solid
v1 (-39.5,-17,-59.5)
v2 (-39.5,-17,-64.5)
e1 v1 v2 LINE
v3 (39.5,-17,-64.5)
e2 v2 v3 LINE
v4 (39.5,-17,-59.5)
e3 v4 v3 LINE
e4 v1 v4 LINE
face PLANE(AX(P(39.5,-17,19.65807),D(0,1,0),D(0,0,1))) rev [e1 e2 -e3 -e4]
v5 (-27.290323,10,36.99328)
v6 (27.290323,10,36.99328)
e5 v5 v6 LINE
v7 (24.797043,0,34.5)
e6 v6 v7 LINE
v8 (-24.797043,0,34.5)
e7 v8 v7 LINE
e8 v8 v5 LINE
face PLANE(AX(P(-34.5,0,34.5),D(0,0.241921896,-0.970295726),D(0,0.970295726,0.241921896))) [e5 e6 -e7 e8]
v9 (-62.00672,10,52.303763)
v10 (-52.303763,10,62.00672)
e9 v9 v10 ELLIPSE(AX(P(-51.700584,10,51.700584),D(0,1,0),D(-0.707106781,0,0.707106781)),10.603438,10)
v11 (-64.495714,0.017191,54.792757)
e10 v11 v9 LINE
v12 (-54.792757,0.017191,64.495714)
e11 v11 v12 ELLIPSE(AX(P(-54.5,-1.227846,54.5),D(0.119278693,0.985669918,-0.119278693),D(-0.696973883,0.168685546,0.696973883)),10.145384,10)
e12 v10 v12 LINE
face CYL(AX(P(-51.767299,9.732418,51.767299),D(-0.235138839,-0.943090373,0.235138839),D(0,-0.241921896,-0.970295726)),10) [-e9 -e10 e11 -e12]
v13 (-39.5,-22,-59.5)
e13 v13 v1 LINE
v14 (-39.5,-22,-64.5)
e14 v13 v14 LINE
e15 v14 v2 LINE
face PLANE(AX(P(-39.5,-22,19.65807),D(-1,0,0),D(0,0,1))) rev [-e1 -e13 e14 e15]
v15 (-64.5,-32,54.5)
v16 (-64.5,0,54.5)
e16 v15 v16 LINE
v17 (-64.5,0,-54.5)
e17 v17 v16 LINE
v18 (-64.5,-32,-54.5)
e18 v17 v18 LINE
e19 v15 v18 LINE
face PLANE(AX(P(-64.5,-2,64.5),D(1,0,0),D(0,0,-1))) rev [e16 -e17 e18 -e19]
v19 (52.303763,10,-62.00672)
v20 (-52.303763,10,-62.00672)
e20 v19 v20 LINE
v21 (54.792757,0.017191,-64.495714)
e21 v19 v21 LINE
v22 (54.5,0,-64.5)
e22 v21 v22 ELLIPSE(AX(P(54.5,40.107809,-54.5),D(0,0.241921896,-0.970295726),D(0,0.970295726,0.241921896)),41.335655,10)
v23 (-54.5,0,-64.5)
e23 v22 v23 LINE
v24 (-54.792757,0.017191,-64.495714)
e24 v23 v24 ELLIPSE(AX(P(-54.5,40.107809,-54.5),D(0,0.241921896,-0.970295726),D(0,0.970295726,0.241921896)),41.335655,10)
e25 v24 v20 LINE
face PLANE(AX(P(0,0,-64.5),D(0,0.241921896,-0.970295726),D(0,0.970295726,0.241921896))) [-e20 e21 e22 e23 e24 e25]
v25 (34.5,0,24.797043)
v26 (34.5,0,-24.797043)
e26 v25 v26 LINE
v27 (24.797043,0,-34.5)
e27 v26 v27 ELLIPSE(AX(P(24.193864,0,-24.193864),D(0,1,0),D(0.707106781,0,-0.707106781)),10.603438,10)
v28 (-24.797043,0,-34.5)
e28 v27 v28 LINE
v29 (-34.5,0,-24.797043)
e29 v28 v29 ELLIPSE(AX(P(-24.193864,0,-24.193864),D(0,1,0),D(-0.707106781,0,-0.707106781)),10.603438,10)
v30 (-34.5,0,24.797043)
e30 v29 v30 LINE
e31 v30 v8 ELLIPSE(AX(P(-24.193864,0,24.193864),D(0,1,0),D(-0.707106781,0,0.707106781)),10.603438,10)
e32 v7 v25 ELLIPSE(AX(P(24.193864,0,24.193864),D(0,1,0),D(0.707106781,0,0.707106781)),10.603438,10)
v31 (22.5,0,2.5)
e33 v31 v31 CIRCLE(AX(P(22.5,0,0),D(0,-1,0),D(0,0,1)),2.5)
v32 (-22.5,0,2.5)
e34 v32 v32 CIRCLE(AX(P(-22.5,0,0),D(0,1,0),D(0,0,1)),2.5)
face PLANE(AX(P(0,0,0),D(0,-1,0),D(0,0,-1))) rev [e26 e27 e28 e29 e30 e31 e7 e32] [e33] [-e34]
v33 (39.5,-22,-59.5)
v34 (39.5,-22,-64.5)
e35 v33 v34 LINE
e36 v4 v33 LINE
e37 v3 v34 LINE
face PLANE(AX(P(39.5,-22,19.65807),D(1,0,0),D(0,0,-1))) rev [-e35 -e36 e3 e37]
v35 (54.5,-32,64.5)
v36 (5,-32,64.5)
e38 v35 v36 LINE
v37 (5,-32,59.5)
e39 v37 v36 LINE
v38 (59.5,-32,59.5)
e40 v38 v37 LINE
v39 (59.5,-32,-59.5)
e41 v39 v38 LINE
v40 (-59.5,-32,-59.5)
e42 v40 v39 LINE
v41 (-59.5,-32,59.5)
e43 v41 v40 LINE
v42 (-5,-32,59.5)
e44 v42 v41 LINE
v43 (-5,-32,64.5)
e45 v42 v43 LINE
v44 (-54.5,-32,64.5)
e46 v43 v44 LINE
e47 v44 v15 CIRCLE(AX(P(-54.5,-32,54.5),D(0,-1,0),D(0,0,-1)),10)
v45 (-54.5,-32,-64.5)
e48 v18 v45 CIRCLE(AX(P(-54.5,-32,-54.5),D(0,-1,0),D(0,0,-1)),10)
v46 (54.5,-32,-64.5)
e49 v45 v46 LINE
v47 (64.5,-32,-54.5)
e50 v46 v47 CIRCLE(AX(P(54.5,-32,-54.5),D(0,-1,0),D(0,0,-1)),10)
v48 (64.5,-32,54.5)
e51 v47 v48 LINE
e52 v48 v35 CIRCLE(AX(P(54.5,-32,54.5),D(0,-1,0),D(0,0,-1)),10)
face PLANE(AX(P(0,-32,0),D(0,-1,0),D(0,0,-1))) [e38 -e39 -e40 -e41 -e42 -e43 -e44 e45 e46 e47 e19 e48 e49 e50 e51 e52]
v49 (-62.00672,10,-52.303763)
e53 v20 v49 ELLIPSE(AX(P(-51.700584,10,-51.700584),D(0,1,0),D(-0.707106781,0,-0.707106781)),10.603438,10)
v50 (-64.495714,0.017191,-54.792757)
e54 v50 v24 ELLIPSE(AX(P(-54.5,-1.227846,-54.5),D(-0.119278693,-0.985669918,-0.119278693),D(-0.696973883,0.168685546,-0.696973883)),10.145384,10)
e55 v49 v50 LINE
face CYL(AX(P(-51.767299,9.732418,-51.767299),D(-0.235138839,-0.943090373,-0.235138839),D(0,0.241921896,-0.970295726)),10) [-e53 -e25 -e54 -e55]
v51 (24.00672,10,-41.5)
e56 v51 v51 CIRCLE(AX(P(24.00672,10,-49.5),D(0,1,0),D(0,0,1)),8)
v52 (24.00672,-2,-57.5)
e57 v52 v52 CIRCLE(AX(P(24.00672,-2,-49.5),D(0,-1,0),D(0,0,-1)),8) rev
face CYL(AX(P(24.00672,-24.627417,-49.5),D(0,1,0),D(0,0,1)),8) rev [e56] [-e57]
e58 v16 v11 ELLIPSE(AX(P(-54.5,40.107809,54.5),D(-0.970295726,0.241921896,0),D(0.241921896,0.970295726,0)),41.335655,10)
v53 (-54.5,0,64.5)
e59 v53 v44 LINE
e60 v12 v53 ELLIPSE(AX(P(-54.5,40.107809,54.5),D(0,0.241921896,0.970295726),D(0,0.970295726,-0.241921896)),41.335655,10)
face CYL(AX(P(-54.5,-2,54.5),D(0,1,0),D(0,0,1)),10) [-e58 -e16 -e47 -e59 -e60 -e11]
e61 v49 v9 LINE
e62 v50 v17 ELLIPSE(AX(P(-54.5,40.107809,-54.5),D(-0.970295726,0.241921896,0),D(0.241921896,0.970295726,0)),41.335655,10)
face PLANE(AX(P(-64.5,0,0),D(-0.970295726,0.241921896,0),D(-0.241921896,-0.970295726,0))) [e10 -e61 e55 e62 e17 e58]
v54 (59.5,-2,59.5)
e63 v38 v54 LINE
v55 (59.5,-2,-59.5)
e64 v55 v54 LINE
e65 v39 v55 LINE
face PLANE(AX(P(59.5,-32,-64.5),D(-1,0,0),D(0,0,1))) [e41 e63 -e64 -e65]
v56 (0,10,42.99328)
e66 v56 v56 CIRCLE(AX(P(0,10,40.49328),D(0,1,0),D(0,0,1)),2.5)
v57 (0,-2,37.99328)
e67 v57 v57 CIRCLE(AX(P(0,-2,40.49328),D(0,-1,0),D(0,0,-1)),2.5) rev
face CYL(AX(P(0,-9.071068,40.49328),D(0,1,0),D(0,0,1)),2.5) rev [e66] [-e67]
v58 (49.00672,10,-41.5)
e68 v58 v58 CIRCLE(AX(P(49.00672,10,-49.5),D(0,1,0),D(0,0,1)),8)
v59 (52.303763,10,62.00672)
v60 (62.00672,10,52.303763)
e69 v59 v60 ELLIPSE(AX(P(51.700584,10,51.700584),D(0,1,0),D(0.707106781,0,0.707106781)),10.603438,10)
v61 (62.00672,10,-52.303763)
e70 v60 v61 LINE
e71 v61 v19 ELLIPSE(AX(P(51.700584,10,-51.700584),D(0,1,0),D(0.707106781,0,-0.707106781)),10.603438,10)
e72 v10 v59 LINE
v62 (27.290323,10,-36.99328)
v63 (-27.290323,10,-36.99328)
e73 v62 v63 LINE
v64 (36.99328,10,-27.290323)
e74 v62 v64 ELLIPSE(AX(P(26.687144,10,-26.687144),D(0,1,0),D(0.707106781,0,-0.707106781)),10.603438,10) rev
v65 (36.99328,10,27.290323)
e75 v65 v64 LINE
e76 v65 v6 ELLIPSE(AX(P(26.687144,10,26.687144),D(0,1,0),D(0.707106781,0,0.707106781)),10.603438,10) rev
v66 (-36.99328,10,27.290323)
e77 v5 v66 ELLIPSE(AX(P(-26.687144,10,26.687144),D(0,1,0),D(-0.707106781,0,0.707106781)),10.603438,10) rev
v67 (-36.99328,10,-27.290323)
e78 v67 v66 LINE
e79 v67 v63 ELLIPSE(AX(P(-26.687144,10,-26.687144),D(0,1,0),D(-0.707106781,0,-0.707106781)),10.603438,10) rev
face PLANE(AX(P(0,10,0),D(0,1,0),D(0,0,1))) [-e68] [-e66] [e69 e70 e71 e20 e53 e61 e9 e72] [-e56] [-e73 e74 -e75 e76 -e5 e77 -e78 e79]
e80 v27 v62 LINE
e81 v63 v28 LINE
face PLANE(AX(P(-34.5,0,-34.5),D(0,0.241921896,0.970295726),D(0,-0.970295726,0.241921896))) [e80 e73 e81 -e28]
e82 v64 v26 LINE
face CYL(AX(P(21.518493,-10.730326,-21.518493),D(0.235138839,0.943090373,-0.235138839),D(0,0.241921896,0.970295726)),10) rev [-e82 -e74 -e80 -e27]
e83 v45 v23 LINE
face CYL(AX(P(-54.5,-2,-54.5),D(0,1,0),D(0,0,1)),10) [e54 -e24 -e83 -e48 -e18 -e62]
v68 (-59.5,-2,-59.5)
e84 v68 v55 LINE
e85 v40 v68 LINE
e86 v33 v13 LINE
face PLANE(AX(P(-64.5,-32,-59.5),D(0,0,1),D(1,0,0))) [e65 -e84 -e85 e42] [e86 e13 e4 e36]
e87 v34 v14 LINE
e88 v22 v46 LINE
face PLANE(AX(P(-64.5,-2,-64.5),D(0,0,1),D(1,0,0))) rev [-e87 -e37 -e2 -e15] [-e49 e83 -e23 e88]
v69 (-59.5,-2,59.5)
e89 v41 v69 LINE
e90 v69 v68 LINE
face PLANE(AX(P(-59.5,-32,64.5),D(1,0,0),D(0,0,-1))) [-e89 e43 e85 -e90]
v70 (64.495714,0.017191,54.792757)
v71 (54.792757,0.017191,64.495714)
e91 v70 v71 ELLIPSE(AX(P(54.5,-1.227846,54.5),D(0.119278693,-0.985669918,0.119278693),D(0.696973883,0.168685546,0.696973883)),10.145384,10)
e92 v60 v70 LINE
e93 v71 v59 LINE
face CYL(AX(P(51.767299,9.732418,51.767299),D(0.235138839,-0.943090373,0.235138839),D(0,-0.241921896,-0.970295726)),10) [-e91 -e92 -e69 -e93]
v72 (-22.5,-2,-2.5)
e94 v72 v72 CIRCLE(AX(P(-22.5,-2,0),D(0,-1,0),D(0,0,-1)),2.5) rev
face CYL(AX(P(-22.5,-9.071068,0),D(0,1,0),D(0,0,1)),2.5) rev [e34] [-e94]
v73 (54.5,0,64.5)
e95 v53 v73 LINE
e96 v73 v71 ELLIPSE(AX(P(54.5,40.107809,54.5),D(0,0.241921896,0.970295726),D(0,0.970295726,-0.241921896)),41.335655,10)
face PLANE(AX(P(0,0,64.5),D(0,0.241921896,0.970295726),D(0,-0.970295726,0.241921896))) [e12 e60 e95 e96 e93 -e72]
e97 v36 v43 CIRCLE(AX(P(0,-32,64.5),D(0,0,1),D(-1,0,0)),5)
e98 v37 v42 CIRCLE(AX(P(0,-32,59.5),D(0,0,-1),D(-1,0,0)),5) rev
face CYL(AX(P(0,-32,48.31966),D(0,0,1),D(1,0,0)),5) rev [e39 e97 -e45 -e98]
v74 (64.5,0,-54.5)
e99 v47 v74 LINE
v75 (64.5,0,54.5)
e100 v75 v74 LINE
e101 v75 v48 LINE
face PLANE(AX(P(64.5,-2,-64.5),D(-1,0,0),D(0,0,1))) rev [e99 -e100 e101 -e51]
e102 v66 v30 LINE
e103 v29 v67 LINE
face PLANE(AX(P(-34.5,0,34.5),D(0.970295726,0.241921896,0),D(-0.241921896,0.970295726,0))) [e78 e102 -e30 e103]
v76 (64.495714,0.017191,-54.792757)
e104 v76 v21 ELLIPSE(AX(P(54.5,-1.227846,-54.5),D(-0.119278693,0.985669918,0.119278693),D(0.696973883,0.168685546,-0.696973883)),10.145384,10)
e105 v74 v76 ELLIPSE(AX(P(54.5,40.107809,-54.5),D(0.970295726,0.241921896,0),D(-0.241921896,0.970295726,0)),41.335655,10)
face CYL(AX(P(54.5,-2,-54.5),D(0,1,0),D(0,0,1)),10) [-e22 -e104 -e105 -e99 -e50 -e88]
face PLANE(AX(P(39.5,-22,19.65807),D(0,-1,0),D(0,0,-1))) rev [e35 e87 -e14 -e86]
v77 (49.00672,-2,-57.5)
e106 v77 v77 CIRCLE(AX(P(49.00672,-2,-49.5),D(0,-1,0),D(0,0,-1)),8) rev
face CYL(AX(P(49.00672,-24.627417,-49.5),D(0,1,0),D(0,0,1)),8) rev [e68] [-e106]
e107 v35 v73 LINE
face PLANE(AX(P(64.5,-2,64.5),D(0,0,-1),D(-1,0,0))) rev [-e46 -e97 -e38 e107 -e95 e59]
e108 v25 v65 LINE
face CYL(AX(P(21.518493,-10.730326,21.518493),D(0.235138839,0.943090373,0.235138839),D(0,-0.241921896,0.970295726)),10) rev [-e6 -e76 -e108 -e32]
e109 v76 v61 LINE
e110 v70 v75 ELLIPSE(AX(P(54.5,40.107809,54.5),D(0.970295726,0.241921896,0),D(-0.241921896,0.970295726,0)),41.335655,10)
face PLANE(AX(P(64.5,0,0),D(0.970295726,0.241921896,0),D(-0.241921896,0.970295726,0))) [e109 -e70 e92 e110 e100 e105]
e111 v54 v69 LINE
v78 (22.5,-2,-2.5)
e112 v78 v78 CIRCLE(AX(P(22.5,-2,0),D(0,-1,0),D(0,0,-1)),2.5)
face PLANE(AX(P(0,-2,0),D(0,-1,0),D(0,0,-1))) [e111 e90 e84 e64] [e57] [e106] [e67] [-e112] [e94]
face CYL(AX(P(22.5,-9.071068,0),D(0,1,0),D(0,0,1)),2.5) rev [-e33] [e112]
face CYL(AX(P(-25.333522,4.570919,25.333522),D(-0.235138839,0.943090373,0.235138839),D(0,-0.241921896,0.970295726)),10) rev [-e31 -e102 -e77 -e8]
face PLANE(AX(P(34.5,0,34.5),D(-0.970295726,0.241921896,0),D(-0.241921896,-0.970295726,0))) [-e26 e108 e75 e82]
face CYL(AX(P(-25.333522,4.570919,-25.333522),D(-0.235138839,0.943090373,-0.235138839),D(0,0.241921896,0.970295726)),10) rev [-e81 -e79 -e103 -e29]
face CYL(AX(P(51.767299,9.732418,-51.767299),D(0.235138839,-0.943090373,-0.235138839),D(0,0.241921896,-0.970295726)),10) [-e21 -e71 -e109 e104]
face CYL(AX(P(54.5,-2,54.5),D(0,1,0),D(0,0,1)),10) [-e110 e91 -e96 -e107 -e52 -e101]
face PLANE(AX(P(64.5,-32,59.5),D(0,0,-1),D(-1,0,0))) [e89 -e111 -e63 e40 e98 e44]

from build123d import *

# Parameters (mm, degrees)
SKETCH1_W           = 129
SKETCH1_H           = 129
SKETCH1_W_2         = 69
SKETCH1_H_2         = 69
EXTRUDE_THIN1_DEPTH = 10
EXTRUDE_THIN1_DRAFT = 14
FILLET1_R           = 10
SKETCH3_W           = 129
SKETCH3_H           = 129
BOSS_EXTRUDE1_DEPTH = 2
SKETCH4_R           = 2.5
CUT_EXTRUDE1_DEPTH  = 2
SKETCH5_W           = 129
SKETCH5_H           = 129
SKETCH5_W_2         = 119
SKETCH5_H_2         = 119
EXTRUDE_THIN2_DEPTH = 30
CUT_EXTRUDE2_DEPTH  = 5
SKETCH7_R           = 2.5
CUT_EXTRUDE3_DEPTH  = 12
FILLET2_R           = 10
SKETCH8_W           = 79
SKETCH8_H           = 5
CUT_EXTRUDE4_DEPTH  = 5
SKETCH9_R           = 8
CUT_EXTRUDE5_DEPTH  = 12
SKETCH9_3_R         = 8
CUT_EXTRUDE6_DEPTH  = 12


with BuildPart() as part:
    # Sketch1 → Extrude-Thin1 (with draft: the straight prism first)
    with BuildSketch(Plane(origin=(0, 0, 0), x_dir=(1, 0, 0), z_dir=(0, 1, 0))):
        Rectangle(SKETCH1_W, SKETCH1_H)
        Rectangle(SKETCH1_W_2, SKETCH1_H_2, mode=Mode.SUBTRACT)
    extrude(amount=EXTRUDE_THIN1_DEPTH)
    # Extrude-Thin1: the draft: its side faces are tilted about the plane it starts from
    extrude_thin1_sides = [part.faces().sort_by_distance(p)[0] for p in [
        (0, 5, -64.5),
        (-64.5, 5, 0),
        (0, 5, 64.5),
        (64.5, 5, 0),
        (34.5, 5, 0),
        (0, 5, 34.5),
        (-34.5, 5, 0),
        (0, 5, -34.5),
    ]]
    draft(extrude_thin1_sides, Plane(origin=(0, 0, 0), x_dir=(1, 0, 0), z_dir=(0, 1, 0)), EXTRUDE_THIN1_DRAFT)

    # Fillet1
    fillet1_edges = [part.edges().sort_by_distance(p)[0] for p in [
        (35.746640014, 5, 35.746640014),
        (35.746640014, 5, -35.746640014),
        (-35.746640014, 5, -35.746640014),
        (-35.746640014, 5, 35.746640014),
    ]]
    fillet(fillet1_edges, radius=FILLET1_R)

    # Sketch3 → Boss-Extrude1 (add)
    with BuildSketch(Plane.XZ):
        Rectangle(SKETCH3_W, SKETCH3_H)
    extrude(amount=BOSS_EXTRUDE1_DEPTH)

    # Sketch4 → Cut-Extrude1 (cut)
    with BuildSketch(Plane(origin=(0, 0, 0), x_dir=(1, 0, 0), z_dir=(0, 1, 0))):
        with Locations(Location((-22.5, 0, 0), (0, 0, 270))):
            Circle(SKETCH4_R)
    cut_extrude1 = extrude(amount=-CUT_EXTRUDE1_DEPTH, mode=Mode.SUBTRACT)

    # Mirror1: Cut-Extrude1 across plane
    add(cut_extrude1.mirror(Plane(origin=(0, 0, 0), x_dir=(0, 0, 1), z_dir=(1, 0, 0))), mode=Mode.SUBTRACT)

    # Sketch5 → Extrude-Thin2 (add)
    with BuildSketch(Plane.XZ.offset(2)):
        Rectangle(SKETCH5_W, SKETCH5_H)
        Rectangle(SKETCH5_W_2, SKETCH5_H_2, mode=Mode.SUBTRACT)
    extrude(amount=EXTRUDE_THIN2_DEPTH)

    # Sketch6 → Cut-Extrude2 (cut)
    with BuildSketch(Plane.XY.offset(64.5)):
        with BuildLine():
            Line((-5, -32), (5, -32))
            ThreePointArc((5, -32), (0, -27), (-5, -32))
        make_face()
    extrude(amount=-CUT_EXTRUDE2_DEPTH, mode=Mode.SUBTRACT)

    # Sketch7 → Cut-Extrude3 (cut)
    with BuildSketch(Plane(origin=(0, 10, 0), x_dir=(1, 0, 0), z_dir=(0, 1, 0))):
        with Locations(Location((0, -40.493280028, 0), (0, 0, 270))):
            Circle(SKETCH7_R)
    extrude(amount=-CUT_EXTRUDE3_DEPTH, mode=Mode.SUBTRACT)

    # Fillet2
    # the kernel refuses this fillet: 10 mm, written as the material it takes off along each edge
    with BuildSketch(Plane(origin=(-64.5, -57, -64.5), x_dir=(1, 0, 0), z_dir=(0, 1, 0)), Plane(origin=(64.5, 25, -64.5), x_dir=(-1, 0, 0), z_dir=(0, -1, 0)), Plane(origin=(-64.5, -57, 64.5), x_dir=(0, 0, -1), z_dir=(0, 1, 0))) as fillet2_piece_1:
        with BuildLine():
            CenterArc((FILLET2_R, -FILLET2_R), FILLET2_R, 90, 90)
            Line((0, -FILLET2_R), (0, 0))
            Line((0, 0), (FILLET2_R, 0))
        make_face()
    extrude(amount=82, mode=Mode.SUBTRACT)
    with BuildSketch(Plane(origin=(64.5, -57, 64.5), x_dir=(0, 0, -1), z_dir=(0, 1, 0))) as fillet2_piece_2:
        with BuildLine():
            CenterArc((FILLET2_R, FILLET2_R), FILLET2_R, 180, 90)
            Line((0, FILLET2_R), (0, 0))
            Line((0, 0), (FILLET2_R, 0))
        make_face()
    extrude(amount=82, mode=Mode.SUBTRACT)
    with BuildSketch(Plane(origin=(70.043929395, -22.235486312, 70.043929395), x_dir=(0.05688523373566075, -0.22815421086671833, -0.9719617925858115), z_dir=(-0.23513883931281052, 0.9430903734495696, -0.23513883931281052)), Plane(origin=(70.043929395, -22.235486312, -70.043929395), x_dir=(-0.9719617925858115, -0.22815421086671833, -0.05688523373566075), z_dir=(-0.23513883931281052, 0.9430903734495696, 0.23513883931281052))) as fillet2_piece_3:
        with BuildLine():
            CenterArc((FILLET2_R * 0.94309037345, FILLET2_R), FILLET2_R, 183.355221767, 86.644778233)
            Line((-FILLET2_R * 0.0551954991819, FILLET2_R * 0.941473796429), (0, 0))
            Line((0, 0), (FILLET2_R * 0.94309037345, 0))
        make_face()
    extrude(amount=57.757956351, mode=Mode.SUBTRACT)
    with BuildSketch(Plane(origin=(-70.043929395, -22.235486312, 70.043929395), x_dir=(-0.05688523373566065, -0.22815421086671833, -0.9719617925858115), z_dir=(0.23513883931281052, 0.9430903734495696, -0.23513883931281052)), Plane(origin=(-70.043929395, -22.235486312, -70.043929395), x_dir=(0.9719617925858115, -0.22815421086671833, -0.05688523373566065), z_dir=(0.23513883931281052, 0.9430903734495696, 0.23513883931281052))) as fillet2_piece_4:
        with BuildLine():
            CenterArc((FILLET2_R * 0.94309037345, -FILLET2_R), FILLET2_R, 90, 86.644778233)
            Line((-FILLET2_R * 0.0551954991819, -FILLET2_R * 0.941473796429), (0, 0))
            Line((0, 0), (FILLET2_R * 0.94309037345, 0))
        make_face()
    extrude(amount=57.757956351, mode=Mode.SUBTRACT)

    # Sketch8 → Cut-Extrude4 (cut)
    with BuildSketch(Plane(origin=(0, 0, -64.5), x_dir=(-1, 0, 0), z_dir=(0, 0, -1))):
        with Locations((0, -19.5)):
            Rectangle(SKETCH8_W, SKETCH8_H)
    extrude(amount=-CUT_EXTRUDE4_DEPTH, mode=Mode.SUBTRACT)

    # Sketch9 → Cut-Extrude5 (cut)
    with BuildSketch(Plane(origin=(0, 10, 0), x_dir=(1, 0, 0), z_dir=(0, 1, 0))):
        with Locations(Location((49.006719972, 49.5, 0), (0, 0, 270))):
            Circle(SKETCH9_R)
    extrude(amount=-CUT_EXTRUDE5_DEPTH, mode=Mode.SUBTRACT)

    # Sketch9<3> → Cut-Extrude6 (cut)
    with BuildSketch(Plane(origin=(0, 10, 0), x_dir=(1, 0, 0), z_dir=(0, 1, 0))):
        with Locations(Location((49.006719972, 49.5, 0), (0, 0, 270))):
            Circle(SKETCH9_3_R)
        with Locations(Location((24.006719972, 49.5, 0), (0, 0, 270))):
            Circle(SKETCH9_3_R)
    extrude(amount=-CUT_EXTRUDE6_DEPTH, mode=Mode.SUBTRACT)


solid = part.part
